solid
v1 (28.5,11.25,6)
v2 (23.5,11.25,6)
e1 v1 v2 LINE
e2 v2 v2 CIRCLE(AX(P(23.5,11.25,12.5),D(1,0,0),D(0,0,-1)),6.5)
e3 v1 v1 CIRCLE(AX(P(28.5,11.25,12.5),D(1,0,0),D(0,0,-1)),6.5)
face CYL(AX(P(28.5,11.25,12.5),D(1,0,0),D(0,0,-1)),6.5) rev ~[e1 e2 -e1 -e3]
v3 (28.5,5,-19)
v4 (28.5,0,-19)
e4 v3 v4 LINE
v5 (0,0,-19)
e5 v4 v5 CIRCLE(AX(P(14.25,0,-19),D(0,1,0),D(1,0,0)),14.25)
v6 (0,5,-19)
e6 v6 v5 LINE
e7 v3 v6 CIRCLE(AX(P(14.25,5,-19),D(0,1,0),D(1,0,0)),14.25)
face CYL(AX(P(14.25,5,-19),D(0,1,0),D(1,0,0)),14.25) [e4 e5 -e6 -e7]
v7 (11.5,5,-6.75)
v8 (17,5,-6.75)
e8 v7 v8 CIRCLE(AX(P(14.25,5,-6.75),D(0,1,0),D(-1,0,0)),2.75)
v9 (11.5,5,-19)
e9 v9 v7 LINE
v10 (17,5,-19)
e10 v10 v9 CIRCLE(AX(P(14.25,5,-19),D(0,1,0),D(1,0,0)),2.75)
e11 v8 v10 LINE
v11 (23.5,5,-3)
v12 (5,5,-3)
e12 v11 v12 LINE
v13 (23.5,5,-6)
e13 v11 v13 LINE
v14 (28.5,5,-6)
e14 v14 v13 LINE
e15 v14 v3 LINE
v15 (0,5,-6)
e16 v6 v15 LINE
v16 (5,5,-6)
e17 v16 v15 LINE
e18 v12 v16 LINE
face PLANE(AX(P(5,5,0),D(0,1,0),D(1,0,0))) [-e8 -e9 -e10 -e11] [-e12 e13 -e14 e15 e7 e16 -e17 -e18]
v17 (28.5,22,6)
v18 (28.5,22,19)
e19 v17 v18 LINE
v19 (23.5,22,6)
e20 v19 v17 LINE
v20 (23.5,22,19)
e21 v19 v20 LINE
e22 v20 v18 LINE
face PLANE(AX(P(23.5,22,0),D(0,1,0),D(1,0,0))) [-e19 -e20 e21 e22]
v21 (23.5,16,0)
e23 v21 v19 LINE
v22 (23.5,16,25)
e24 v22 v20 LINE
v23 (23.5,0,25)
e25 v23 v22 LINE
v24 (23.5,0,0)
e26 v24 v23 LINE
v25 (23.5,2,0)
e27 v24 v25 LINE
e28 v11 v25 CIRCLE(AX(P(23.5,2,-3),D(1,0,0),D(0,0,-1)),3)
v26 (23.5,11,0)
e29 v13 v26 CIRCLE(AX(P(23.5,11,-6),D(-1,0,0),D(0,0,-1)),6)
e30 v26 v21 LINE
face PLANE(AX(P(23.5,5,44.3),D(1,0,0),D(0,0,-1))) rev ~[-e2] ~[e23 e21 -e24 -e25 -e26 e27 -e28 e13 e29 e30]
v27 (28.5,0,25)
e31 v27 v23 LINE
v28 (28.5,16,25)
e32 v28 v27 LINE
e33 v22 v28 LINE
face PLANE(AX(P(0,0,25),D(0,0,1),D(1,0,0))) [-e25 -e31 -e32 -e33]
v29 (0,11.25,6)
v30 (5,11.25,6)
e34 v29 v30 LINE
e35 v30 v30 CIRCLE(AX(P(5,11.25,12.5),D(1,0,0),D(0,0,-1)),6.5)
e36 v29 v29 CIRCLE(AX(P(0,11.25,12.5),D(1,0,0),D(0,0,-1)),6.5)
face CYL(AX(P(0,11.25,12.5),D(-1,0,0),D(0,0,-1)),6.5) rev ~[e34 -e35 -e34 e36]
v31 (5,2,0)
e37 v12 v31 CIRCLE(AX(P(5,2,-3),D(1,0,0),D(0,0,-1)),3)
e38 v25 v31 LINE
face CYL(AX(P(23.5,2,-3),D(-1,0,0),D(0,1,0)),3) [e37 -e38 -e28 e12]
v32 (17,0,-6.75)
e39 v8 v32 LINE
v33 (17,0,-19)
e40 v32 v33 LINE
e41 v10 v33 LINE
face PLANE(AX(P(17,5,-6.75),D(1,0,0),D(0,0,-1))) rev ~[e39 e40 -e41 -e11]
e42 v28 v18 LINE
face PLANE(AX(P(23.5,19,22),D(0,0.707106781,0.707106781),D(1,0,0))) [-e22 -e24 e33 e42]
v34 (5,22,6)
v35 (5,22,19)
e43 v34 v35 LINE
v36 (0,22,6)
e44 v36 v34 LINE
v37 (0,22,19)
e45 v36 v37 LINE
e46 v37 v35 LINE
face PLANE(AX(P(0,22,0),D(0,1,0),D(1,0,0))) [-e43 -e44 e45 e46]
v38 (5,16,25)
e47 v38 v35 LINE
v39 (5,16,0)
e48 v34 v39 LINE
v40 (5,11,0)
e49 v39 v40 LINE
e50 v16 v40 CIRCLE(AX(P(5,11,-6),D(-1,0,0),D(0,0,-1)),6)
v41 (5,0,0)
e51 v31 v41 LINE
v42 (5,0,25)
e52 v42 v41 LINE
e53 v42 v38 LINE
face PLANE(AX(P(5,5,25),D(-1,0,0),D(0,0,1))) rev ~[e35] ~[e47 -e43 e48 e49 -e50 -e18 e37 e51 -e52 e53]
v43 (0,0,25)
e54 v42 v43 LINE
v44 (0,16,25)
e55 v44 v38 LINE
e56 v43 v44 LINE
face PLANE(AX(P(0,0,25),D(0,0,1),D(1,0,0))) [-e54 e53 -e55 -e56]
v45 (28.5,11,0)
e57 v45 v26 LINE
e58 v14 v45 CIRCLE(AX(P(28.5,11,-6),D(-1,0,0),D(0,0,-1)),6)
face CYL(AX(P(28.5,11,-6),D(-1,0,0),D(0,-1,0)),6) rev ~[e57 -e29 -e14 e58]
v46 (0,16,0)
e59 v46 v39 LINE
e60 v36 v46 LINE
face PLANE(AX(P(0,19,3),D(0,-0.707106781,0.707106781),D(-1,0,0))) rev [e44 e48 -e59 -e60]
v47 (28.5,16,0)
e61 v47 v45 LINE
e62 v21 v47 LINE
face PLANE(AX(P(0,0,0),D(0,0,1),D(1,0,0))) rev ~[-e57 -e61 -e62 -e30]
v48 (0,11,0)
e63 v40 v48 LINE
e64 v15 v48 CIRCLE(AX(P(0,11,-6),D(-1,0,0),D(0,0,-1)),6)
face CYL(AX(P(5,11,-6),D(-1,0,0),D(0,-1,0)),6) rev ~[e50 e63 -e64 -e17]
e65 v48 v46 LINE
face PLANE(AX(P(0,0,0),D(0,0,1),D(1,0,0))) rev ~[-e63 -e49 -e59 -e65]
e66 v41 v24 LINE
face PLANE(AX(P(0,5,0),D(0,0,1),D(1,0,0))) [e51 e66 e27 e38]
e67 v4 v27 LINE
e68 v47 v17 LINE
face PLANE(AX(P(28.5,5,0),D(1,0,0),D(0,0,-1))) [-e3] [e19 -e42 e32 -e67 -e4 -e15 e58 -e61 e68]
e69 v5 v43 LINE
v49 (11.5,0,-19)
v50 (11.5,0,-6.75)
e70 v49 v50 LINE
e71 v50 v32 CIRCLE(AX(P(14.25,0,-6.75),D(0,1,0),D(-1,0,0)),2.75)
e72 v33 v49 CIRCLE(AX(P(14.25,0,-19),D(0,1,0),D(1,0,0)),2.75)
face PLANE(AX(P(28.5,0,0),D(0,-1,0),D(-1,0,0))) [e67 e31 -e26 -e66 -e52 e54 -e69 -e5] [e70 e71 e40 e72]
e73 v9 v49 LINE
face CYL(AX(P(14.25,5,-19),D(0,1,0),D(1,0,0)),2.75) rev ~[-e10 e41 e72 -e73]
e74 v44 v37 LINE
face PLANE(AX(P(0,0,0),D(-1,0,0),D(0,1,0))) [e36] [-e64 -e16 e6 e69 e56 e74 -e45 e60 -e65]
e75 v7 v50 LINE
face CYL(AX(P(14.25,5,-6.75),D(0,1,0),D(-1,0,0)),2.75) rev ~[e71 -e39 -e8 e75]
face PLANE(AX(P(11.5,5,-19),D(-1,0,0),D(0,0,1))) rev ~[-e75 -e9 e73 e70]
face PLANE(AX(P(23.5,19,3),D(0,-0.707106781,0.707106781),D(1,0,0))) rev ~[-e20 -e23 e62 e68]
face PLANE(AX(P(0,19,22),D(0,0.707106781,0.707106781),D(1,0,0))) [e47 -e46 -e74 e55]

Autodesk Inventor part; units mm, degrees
ref_plane "YZ Plane" through (0, 0, 0) normal (1, 0, 0) x (0, 1, 0)
ref_plane "XZ Plane" through (0, 0, 0) normal (0, 1, 0) x (-1, 0, 0)
ref_plane "XY Plane" through (0, 0, 0) normal (0, 0, 1) x (1, 0, 0)
sketch "Skizze1" plane through (0, 0, 0) normal (0, 0, 1) x (1, 0, 0)
  line L0 (0, 0) -> (0, 22)
  line L1 (0, 22) -> (5, 22)
  line L2 (5, 22) -> (5, 5)
  line L3 (5, 5) -> (23.5, 5)
  line L4 (23.5, 5) -> (23.5, 22)
  line L5 (23.5, 22) -> (28.5, 22)
  line L6 (28.5, 22) -> (28.5, 0)
  line L7 (28.5, 0) -> (0, 0)
  line L8 (14.25, 5) -> (14.25, 0) construction
  line L9 (0, 11.55) -> (28.5, 11.55) construction
  dimension "d0" = 5
  dimension "d1" = 5
  dimension "d2" = 11.55
  dimension "d3" = 18.5
  dimension "d4" = 22
  dimension "d14" = 28.5
extrude "Extrusion1" add sketch "Skizze1" along normal blind 25
sketch "Skizze2" plane through (28.5, 0, 0) normal (1, 0, 0) x (0, 0, -1)
  circle A0 centre (-12.5, 11.25) radius 5
  line L0 (-12.5, 11.25) -> (-12.5, 22) construction
  line L1 (0, 22) -> (-25, 22) construction
  circle A1 centre (-12.5, 11.25) radius 6.5
  point P0 (0, 0)
  point P1 (-25, 0)
  dimension "d7" = 11.25
  dimension "d8" = 10
  dimension "d20" = 13
extrude "Extrusion2" cut sketch "Skizze2" against normal through all contours A0
sketch "Skizze3" plane through (5, 5, 0) normal (0, 1, 0) x (1, 0, 0)
  line L0 (18.5, -25) -> (0, -25) construction
  line L1 (9.25, -25) -> (9.25, 0) construction
  line L2 (18.5, 0) -> (0, 0) construction
  line L3 (9.25, -44.3) -> (9.25, -5.7) construction
  line L4 (18.5, -44.3) -> (18.5, -5.7)
  line L5 (0, -5.7) -> (0, -44.3)
  arc A0 (0, -44.3) -> (18.5, -44.3) centre (9.25, -44.3) ccw
  arc A1 (18.5, -5.7) -> (0, -5.7) centre (9.25, -5.7) ccw
  line L6 (29.2, -12.5) -> (-10.7, -12.5) construction
  line L7 (8, 0) -> (8, -25) construction
  line L8 (18, 0) -> (18, -25) construction
  line L9 (0, -25) -> (-5, -25) projected
  line L10 (9.25, 0) -> (1.9649, 0)
  line L11 (18.5, 0) -> (0, 0)
  line L12 (-5, 0) -> (23.5, 0) projected
  line L13 (18.5, 0) -> (18.5, -5.7)
  line L14 (0, 0) -> (0, -5.7)
  point P0 (16.5351, 0)
  dimension "d11" = 18.5
  dimension "d25" = 6.8
  dimension "d32" = 0.5
  dimension "d33" = 10
extrude "Extrusion3" cut sketch "Skizze3" against normal through all
sketch "Skizze4" plane through (5, 5, 0) normal (0, 1, 0) x (1, 0, 0)
  line L0 (18.5, 0) -> (0, 0) projected
  line L1 (9.25, -11) -> (9.25, 19) construction
  line L2 (-5, 0) -> (23.5, 0) projected
  line L3 (0, -11) -> (0, 19)
  line L4 (18.5, 19) -> (18.5, -11)
  arc A0 (0, -11) -> (18.5, -11) centre (9.25, -11) ccw
  arc A1 (18.5, 19) -> (0, 19) centre (9.25, 19) ccw
  line L5 (6.5, 19) -> (6.5, -11)
  arc A2 (6.5, -11) -> (12, -11) centre (9.25, -11) ccw
  line L6 (12, -11) -> (12, 19)
  arc A3 (12, 19) -> (6.5, 19) centre (9.25, 19) ccw
  arc A4 (6.5, 6.75) -> (12, 6.75) centre (9.25, 6.75) ccw
  line L7 (23.5, -11) -> (23.5, 19)
  arc A5 (23.5, 19) -> (-5, 19) centre (9.25, 19) ccw
  line L8 (-5, 19) -> (-5, -11)
  arc A6 (-5, -11) -> (23.5, -11) centre (9.25, -11) ccw
  arc A7 (18.5, 0) -> (0, 0) centre (9.25, -11.8084) ccw
  point P0 (9.25, 4)
  point P1 (18.5, 0)
  point P2 (6.5, 0)
  point P3 (12, 0)
  point P4 (8.25, 0)
  point P5 (9.25, 0)
  point P6 (18.5, -5.7)
  point P7 (0, -5.7)
  point P8 (0, -5.7)
  dimension "d15" = 15
  dimension "d18" = 5.5
  dimension "d26" = 4
  dimension "d34" = 5
  dimension "d35" = 15
extrude "Extrusion4" add sketch "Skizze4" against normal up to surface (5 mm away) contours L4 A1 L3 L2 L8 A5 L7 | A7 L6 A3 L5 L3 A1 L4 | L0 L6 A7 | L0 L5 A7 L6 | A7 L5 A4 L6 | L0 A7 L5
extrude "Extrusion5" cut sketch "Skizze2" against normal blind 5
extrude "Extrusion6" cut sketch "Skizze2" along normal blind 5 from surface at -28.5
chamfer "Fase1" distance 6 angle 45 4 edges at (26, 22, 25) (2.5, 22, 25) (2.5, 22, 0) (26, 22, 0)
fillet "Rundung4" radius 6 2 edges at (26, 5, 0) (2.5, 5, 0)
ref_plane "Arbeitsebene2" through (14.25, 0, -19) normal (1, 0, 0) x (0, 0, -1)
fillet "Rundung5" radius 3 1 edges at (14.25, 5, 0)
properties part number "BeltDiscBottomPart"
